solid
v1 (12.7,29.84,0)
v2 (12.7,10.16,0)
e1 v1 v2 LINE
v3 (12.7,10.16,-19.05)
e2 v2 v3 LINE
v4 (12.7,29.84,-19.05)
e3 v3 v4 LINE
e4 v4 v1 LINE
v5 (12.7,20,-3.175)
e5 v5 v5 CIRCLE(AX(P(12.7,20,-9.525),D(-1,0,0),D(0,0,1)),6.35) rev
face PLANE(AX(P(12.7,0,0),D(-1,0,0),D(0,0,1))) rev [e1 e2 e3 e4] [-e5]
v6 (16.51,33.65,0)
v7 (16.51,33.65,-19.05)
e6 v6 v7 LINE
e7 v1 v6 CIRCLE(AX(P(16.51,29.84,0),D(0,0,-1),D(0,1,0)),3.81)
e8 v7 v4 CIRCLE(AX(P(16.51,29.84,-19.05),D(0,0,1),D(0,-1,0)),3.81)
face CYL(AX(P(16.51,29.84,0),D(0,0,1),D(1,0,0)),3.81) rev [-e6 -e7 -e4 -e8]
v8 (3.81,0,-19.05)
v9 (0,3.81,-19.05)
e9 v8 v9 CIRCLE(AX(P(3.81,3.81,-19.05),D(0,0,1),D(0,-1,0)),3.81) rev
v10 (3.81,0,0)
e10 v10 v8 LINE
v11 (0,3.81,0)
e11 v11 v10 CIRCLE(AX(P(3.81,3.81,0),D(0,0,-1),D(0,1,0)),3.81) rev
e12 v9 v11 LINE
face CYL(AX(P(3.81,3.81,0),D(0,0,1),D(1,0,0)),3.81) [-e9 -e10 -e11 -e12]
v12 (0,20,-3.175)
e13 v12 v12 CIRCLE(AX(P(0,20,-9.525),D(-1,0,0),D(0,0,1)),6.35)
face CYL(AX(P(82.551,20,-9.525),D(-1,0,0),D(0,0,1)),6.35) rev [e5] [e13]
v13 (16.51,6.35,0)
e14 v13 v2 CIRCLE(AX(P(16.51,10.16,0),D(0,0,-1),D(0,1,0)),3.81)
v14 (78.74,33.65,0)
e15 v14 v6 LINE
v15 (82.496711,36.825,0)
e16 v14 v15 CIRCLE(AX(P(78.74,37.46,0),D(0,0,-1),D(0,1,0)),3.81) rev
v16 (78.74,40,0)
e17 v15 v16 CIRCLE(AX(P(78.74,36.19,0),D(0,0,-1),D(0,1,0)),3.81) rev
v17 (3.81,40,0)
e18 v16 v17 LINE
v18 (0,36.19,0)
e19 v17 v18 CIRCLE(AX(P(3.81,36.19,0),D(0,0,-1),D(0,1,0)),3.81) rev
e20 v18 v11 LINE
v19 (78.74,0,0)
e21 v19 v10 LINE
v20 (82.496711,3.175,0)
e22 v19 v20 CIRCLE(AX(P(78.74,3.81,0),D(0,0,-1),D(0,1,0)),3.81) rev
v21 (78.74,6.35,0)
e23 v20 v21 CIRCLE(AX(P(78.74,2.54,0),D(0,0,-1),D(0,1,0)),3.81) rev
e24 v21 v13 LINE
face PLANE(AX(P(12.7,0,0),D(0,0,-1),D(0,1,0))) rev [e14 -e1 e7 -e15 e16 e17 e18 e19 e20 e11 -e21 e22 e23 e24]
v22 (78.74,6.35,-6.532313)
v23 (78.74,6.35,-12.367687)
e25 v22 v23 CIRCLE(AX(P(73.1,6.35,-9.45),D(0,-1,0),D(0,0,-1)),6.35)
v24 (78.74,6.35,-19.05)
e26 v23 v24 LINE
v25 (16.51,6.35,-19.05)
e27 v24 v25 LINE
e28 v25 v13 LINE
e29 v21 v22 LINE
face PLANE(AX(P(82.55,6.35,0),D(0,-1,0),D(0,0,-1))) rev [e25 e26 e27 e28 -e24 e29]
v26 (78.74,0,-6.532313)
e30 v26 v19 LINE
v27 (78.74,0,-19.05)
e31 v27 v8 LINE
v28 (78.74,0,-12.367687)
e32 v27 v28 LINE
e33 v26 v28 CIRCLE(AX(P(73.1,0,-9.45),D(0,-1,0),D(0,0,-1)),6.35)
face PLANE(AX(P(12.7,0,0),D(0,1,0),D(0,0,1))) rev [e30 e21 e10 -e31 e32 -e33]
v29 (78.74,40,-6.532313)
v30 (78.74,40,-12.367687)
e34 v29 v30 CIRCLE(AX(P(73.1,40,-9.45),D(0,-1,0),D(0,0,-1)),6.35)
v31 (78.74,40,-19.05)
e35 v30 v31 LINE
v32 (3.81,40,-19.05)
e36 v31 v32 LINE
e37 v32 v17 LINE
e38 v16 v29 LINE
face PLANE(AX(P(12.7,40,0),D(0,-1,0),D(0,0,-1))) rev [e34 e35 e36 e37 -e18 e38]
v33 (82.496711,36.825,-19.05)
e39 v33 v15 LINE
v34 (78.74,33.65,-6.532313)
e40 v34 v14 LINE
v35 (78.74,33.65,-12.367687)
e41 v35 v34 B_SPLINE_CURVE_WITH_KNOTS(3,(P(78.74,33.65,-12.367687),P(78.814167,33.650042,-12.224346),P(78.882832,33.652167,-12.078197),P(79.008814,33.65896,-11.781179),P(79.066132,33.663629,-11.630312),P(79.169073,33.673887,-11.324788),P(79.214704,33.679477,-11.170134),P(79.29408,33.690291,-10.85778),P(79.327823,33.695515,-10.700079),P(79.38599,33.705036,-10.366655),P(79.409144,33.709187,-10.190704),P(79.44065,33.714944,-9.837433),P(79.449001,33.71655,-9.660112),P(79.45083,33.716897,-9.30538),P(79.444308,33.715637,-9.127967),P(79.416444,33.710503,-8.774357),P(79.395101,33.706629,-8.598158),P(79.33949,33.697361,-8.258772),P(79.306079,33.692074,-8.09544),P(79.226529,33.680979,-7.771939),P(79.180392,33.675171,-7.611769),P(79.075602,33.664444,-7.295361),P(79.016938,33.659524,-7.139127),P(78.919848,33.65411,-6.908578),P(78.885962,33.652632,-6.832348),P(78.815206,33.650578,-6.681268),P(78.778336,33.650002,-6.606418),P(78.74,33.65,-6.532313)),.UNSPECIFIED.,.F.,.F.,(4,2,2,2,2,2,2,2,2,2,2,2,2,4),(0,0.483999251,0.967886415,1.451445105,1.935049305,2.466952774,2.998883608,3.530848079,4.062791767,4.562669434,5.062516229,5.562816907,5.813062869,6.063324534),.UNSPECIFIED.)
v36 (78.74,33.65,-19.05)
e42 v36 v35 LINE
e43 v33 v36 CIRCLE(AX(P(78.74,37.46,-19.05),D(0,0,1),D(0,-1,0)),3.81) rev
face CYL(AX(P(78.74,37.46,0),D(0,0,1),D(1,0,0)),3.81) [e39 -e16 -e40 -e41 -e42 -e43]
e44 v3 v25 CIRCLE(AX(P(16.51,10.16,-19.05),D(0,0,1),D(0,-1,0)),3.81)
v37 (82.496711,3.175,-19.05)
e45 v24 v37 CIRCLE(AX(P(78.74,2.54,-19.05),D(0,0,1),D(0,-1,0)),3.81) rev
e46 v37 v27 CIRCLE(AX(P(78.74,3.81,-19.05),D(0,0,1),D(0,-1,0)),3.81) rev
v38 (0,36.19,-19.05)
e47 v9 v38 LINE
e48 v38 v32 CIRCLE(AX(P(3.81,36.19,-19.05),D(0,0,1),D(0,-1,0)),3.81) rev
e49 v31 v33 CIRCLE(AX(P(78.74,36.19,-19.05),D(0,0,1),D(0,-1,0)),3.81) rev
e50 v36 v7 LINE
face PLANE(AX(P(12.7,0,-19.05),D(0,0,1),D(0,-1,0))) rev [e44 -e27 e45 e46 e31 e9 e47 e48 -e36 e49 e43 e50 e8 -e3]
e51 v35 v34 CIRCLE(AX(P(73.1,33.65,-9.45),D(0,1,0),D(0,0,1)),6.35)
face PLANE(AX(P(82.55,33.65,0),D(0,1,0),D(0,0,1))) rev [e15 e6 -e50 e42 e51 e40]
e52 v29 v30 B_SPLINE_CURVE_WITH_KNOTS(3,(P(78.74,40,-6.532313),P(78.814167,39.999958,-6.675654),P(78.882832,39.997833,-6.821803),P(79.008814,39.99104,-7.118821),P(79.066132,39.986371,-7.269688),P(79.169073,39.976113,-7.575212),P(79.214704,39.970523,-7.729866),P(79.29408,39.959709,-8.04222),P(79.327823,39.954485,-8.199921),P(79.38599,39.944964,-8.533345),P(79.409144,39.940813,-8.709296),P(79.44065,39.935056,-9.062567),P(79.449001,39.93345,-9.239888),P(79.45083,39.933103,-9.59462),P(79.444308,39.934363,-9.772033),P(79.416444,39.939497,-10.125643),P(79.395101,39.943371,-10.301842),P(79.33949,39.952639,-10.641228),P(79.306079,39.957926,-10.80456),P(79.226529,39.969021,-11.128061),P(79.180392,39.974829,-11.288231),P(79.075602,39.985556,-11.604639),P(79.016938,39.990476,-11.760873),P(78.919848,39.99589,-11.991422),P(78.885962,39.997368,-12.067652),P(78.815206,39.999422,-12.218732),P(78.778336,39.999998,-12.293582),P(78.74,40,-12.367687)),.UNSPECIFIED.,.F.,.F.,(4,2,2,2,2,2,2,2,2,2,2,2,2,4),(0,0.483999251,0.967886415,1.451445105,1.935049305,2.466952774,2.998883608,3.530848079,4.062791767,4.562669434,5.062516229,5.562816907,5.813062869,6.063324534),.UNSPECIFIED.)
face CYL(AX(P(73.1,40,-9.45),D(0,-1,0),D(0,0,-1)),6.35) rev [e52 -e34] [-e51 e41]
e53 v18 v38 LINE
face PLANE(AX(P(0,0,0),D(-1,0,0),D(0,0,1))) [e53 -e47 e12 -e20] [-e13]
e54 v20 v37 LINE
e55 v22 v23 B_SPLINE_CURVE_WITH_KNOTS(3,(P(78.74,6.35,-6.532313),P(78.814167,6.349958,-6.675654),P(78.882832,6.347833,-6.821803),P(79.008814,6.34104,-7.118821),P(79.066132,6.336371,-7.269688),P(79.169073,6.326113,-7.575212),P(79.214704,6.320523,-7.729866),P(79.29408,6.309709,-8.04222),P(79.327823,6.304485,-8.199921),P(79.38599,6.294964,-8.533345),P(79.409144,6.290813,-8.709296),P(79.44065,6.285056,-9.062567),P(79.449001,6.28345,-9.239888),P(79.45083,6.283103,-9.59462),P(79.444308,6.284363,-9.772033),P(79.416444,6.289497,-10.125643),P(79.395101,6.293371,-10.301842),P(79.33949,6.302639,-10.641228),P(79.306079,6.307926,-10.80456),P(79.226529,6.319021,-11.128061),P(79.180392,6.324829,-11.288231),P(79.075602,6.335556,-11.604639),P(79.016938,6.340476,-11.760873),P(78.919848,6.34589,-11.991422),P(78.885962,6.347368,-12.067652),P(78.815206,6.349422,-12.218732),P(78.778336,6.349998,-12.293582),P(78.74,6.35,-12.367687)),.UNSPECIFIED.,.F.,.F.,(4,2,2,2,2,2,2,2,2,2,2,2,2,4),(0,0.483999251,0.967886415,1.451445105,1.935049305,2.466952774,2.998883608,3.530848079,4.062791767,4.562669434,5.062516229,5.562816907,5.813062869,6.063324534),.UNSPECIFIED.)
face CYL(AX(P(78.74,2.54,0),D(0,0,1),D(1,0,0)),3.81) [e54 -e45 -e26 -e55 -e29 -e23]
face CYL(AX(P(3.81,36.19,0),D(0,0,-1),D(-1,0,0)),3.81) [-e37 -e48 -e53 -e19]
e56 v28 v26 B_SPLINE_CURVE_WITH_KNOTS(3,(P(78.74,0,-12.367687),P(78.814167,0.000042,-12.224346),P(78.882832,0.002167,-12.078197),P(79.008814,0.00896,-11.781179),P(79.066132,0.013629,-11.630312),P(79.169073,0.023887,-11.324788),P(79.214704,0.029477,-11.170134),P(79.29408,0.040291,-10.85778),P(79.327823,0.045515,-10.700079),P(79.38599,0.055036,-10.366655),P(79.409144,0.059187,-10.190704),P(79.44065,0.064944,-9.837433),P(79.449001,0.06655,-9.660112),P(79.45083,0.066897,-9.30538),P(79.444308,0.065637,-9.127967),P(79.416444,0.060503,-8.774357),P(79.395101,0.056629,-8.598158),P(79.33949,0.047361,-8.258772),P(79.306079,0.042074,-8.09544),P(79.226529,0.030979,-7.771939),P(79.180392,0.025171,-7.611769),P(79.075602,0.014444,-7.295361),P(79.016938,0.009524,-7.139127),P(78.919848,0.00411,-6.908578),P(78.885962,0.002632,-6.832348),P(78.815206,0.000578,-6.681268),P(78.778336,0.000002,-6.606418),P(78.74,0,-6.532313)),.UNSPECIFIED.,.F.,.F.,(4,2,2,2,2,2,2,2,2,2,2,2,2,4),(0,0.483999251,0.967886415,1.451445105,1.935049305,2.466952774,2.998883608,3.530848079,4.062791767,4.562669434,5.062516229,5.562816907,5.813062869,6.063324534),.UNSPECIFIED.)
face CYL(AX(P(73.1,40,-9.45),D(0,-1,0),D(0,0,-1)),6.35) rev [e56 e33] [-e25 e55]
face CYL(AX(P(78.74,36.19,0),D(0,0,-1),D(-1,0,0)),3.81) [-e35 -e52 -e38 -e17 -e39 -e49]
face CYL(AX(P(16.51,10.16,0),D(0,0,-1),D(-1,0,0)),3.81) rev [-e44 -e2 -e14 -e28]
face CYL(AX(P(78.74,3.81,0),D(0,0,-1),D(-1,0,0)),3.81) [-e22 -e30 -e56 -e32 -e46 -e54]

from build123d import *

# Parameters (mm, degrees)
SKETCH1_W           = 19.05
SKETCH1_H           = 40
BOSS_EXTRUDE1_DEPTH = 12.7
SKETCH2_W           = 19.05
SKETCH2_H           = 6.35
BOSS_EXTRUDE2_DEPTH = 69.85
CUT_EXTRUDE1_REACH  = 95.688
SKETCH5_R           = 6.35
SKETCH6_R           = 6.35
CUT_EXTRUDE2_DEPTH  = 94.687806037
FILLET4_R           = 3.81


with BuildPart() as part:
    # Sketch1 → Boss-Extrude1 (new body)
    with BuildSketch(Plane(origin=(0, 0, 0), x_dir=(0, 0, -1), z_dir=(1, 0, 0))):
        with Locations((9.525, 20)):
            Rectangle(SKETCH1_W, SKETCH1_H)
    extrude(amount=BOSS_EXTRUDE1_DEPTH)

    # Sketch2 → Boss-Extrude2 (add)
    with BuildSketch(Plane(origin=(12.7, 0, 0), x_dir=(0, 0, -1), z_dir=(1, 0, 0))):
        with Locations((9.525, 3.175)):
            Rectangle(SKETCH2_W, SKETCH2_H)
        with Locations((9.525, 36.825)):
            Rectangle(SKETCH2_W, SKETCH2_H)
    extrude(amount=BOSS_EXTRUDE2_DEPTH)

    # Sketch5 → Cut-Extrude1 (cut, up to next)
    with BuildSketch(Plane.ZY, mode=Mode.PRIVATE) as cut_extrude1_sk1:
        with Locations((-9.525, 20)):
            Circle(SKETCH5_R)
    cut_extrude1_tool1 = extrude(cut_extrude1_sk1.sketch, amount=-CUT_EXTRUDE1_REACH, mode=Mode.PRIVATE) & part.part
    add(cut_extrude1_tool1.solids().sort_by_distance((0, 20, -9.525))[0], mode=Mode.SUBTRACT)

    # Sketch6 → Cut-Extrude2 (cut, through all)
    with BuildSketch(Plane.XZ):
        with Locations(Location((73.1, -9.45, 0), (0, 0, 270))):
            Circle(SKETCH6_R)
    extrude(amount=-CUT_EXTRUDE2_DEPTH, mode=Mode.SUBTRACT)

    # Fillet4
    # the kernel refuses this fillet: 3.81 mm, written as the material it adds along each edge
    with BuildSketch(Plane(origin=(12.7, 33.65, 0), x_dir=(1, 0, 0), z_dir=(0, 0, -1)), Plane(origin=(12.7, 6.35, 0), x_dir=(0, 1, 0), z_dir=(0, 0, -1))) as fillet4_piece_1:
        with BuildLine():
            CenterArc((FILLET4_R, FILLET4_R), FILLET4_R, 180, 90)
            Line((0, FILLET4_R), (0, 0))
            Line((0, 0), (FILLET4_R, 0))
        make_face()
    extrude(amount=19.05)
    # the kernel refuses this fillet: 3.81 mm, written as the material it takes off along each edge
    with BuildSketch(Plane(origin=(0, 0, 9.525), x_dir=(1, 0, 0), z_dir=(0, 0, -1)), Plane(origin=(82.55, 0, -28.575), x_dir=(-1, 0, 0), z_dir=(0, 0, 1)), Plane(origin=(82.55, 33.65, 9.525), x_dir=(0, 1, 0), z_dir=(0, 0, -1))) as fillet4_2_piece_1:
        with BuildLine():
            CenterArc((FILLET4_R, -FILLET4_R), FILLET4_R, 90, 90)
            Line((0, -FILLET4_R), (0, 0))
            Line((0, 0), (FILLET4_R, 0))
        make_face()
    extrude(amount=38.1, mode=Mode.SUBTRACT)
    with BuildSketch(Plane(origin=(0, 40, -28.575), x_dir=(0, -1, 0), z_dir=(0, 0, 1)), Plane(origin=(82.55, 6.35, 9.525), x_dir=(0, -1, 0), z_dir=(0, 0, -1)), Plane(origin=(82.55, 40, -28.575), x_dir=(-1, 0, 0), z_dir=(0, 0, 1))) as fillet4_2_piece_2:
        with BuildLine():
            CenterArc((FILLET4_R, FILLET4_R), FILLET4_R, 180, 90)
            Line((0, FILLET4_R), (0, 0))
            Line((0, 0), (FILLET4_R, 0))
        make_face()
    extrude(amount=38.1, mode=Mode.SUBTRACT)


solid = part.part
